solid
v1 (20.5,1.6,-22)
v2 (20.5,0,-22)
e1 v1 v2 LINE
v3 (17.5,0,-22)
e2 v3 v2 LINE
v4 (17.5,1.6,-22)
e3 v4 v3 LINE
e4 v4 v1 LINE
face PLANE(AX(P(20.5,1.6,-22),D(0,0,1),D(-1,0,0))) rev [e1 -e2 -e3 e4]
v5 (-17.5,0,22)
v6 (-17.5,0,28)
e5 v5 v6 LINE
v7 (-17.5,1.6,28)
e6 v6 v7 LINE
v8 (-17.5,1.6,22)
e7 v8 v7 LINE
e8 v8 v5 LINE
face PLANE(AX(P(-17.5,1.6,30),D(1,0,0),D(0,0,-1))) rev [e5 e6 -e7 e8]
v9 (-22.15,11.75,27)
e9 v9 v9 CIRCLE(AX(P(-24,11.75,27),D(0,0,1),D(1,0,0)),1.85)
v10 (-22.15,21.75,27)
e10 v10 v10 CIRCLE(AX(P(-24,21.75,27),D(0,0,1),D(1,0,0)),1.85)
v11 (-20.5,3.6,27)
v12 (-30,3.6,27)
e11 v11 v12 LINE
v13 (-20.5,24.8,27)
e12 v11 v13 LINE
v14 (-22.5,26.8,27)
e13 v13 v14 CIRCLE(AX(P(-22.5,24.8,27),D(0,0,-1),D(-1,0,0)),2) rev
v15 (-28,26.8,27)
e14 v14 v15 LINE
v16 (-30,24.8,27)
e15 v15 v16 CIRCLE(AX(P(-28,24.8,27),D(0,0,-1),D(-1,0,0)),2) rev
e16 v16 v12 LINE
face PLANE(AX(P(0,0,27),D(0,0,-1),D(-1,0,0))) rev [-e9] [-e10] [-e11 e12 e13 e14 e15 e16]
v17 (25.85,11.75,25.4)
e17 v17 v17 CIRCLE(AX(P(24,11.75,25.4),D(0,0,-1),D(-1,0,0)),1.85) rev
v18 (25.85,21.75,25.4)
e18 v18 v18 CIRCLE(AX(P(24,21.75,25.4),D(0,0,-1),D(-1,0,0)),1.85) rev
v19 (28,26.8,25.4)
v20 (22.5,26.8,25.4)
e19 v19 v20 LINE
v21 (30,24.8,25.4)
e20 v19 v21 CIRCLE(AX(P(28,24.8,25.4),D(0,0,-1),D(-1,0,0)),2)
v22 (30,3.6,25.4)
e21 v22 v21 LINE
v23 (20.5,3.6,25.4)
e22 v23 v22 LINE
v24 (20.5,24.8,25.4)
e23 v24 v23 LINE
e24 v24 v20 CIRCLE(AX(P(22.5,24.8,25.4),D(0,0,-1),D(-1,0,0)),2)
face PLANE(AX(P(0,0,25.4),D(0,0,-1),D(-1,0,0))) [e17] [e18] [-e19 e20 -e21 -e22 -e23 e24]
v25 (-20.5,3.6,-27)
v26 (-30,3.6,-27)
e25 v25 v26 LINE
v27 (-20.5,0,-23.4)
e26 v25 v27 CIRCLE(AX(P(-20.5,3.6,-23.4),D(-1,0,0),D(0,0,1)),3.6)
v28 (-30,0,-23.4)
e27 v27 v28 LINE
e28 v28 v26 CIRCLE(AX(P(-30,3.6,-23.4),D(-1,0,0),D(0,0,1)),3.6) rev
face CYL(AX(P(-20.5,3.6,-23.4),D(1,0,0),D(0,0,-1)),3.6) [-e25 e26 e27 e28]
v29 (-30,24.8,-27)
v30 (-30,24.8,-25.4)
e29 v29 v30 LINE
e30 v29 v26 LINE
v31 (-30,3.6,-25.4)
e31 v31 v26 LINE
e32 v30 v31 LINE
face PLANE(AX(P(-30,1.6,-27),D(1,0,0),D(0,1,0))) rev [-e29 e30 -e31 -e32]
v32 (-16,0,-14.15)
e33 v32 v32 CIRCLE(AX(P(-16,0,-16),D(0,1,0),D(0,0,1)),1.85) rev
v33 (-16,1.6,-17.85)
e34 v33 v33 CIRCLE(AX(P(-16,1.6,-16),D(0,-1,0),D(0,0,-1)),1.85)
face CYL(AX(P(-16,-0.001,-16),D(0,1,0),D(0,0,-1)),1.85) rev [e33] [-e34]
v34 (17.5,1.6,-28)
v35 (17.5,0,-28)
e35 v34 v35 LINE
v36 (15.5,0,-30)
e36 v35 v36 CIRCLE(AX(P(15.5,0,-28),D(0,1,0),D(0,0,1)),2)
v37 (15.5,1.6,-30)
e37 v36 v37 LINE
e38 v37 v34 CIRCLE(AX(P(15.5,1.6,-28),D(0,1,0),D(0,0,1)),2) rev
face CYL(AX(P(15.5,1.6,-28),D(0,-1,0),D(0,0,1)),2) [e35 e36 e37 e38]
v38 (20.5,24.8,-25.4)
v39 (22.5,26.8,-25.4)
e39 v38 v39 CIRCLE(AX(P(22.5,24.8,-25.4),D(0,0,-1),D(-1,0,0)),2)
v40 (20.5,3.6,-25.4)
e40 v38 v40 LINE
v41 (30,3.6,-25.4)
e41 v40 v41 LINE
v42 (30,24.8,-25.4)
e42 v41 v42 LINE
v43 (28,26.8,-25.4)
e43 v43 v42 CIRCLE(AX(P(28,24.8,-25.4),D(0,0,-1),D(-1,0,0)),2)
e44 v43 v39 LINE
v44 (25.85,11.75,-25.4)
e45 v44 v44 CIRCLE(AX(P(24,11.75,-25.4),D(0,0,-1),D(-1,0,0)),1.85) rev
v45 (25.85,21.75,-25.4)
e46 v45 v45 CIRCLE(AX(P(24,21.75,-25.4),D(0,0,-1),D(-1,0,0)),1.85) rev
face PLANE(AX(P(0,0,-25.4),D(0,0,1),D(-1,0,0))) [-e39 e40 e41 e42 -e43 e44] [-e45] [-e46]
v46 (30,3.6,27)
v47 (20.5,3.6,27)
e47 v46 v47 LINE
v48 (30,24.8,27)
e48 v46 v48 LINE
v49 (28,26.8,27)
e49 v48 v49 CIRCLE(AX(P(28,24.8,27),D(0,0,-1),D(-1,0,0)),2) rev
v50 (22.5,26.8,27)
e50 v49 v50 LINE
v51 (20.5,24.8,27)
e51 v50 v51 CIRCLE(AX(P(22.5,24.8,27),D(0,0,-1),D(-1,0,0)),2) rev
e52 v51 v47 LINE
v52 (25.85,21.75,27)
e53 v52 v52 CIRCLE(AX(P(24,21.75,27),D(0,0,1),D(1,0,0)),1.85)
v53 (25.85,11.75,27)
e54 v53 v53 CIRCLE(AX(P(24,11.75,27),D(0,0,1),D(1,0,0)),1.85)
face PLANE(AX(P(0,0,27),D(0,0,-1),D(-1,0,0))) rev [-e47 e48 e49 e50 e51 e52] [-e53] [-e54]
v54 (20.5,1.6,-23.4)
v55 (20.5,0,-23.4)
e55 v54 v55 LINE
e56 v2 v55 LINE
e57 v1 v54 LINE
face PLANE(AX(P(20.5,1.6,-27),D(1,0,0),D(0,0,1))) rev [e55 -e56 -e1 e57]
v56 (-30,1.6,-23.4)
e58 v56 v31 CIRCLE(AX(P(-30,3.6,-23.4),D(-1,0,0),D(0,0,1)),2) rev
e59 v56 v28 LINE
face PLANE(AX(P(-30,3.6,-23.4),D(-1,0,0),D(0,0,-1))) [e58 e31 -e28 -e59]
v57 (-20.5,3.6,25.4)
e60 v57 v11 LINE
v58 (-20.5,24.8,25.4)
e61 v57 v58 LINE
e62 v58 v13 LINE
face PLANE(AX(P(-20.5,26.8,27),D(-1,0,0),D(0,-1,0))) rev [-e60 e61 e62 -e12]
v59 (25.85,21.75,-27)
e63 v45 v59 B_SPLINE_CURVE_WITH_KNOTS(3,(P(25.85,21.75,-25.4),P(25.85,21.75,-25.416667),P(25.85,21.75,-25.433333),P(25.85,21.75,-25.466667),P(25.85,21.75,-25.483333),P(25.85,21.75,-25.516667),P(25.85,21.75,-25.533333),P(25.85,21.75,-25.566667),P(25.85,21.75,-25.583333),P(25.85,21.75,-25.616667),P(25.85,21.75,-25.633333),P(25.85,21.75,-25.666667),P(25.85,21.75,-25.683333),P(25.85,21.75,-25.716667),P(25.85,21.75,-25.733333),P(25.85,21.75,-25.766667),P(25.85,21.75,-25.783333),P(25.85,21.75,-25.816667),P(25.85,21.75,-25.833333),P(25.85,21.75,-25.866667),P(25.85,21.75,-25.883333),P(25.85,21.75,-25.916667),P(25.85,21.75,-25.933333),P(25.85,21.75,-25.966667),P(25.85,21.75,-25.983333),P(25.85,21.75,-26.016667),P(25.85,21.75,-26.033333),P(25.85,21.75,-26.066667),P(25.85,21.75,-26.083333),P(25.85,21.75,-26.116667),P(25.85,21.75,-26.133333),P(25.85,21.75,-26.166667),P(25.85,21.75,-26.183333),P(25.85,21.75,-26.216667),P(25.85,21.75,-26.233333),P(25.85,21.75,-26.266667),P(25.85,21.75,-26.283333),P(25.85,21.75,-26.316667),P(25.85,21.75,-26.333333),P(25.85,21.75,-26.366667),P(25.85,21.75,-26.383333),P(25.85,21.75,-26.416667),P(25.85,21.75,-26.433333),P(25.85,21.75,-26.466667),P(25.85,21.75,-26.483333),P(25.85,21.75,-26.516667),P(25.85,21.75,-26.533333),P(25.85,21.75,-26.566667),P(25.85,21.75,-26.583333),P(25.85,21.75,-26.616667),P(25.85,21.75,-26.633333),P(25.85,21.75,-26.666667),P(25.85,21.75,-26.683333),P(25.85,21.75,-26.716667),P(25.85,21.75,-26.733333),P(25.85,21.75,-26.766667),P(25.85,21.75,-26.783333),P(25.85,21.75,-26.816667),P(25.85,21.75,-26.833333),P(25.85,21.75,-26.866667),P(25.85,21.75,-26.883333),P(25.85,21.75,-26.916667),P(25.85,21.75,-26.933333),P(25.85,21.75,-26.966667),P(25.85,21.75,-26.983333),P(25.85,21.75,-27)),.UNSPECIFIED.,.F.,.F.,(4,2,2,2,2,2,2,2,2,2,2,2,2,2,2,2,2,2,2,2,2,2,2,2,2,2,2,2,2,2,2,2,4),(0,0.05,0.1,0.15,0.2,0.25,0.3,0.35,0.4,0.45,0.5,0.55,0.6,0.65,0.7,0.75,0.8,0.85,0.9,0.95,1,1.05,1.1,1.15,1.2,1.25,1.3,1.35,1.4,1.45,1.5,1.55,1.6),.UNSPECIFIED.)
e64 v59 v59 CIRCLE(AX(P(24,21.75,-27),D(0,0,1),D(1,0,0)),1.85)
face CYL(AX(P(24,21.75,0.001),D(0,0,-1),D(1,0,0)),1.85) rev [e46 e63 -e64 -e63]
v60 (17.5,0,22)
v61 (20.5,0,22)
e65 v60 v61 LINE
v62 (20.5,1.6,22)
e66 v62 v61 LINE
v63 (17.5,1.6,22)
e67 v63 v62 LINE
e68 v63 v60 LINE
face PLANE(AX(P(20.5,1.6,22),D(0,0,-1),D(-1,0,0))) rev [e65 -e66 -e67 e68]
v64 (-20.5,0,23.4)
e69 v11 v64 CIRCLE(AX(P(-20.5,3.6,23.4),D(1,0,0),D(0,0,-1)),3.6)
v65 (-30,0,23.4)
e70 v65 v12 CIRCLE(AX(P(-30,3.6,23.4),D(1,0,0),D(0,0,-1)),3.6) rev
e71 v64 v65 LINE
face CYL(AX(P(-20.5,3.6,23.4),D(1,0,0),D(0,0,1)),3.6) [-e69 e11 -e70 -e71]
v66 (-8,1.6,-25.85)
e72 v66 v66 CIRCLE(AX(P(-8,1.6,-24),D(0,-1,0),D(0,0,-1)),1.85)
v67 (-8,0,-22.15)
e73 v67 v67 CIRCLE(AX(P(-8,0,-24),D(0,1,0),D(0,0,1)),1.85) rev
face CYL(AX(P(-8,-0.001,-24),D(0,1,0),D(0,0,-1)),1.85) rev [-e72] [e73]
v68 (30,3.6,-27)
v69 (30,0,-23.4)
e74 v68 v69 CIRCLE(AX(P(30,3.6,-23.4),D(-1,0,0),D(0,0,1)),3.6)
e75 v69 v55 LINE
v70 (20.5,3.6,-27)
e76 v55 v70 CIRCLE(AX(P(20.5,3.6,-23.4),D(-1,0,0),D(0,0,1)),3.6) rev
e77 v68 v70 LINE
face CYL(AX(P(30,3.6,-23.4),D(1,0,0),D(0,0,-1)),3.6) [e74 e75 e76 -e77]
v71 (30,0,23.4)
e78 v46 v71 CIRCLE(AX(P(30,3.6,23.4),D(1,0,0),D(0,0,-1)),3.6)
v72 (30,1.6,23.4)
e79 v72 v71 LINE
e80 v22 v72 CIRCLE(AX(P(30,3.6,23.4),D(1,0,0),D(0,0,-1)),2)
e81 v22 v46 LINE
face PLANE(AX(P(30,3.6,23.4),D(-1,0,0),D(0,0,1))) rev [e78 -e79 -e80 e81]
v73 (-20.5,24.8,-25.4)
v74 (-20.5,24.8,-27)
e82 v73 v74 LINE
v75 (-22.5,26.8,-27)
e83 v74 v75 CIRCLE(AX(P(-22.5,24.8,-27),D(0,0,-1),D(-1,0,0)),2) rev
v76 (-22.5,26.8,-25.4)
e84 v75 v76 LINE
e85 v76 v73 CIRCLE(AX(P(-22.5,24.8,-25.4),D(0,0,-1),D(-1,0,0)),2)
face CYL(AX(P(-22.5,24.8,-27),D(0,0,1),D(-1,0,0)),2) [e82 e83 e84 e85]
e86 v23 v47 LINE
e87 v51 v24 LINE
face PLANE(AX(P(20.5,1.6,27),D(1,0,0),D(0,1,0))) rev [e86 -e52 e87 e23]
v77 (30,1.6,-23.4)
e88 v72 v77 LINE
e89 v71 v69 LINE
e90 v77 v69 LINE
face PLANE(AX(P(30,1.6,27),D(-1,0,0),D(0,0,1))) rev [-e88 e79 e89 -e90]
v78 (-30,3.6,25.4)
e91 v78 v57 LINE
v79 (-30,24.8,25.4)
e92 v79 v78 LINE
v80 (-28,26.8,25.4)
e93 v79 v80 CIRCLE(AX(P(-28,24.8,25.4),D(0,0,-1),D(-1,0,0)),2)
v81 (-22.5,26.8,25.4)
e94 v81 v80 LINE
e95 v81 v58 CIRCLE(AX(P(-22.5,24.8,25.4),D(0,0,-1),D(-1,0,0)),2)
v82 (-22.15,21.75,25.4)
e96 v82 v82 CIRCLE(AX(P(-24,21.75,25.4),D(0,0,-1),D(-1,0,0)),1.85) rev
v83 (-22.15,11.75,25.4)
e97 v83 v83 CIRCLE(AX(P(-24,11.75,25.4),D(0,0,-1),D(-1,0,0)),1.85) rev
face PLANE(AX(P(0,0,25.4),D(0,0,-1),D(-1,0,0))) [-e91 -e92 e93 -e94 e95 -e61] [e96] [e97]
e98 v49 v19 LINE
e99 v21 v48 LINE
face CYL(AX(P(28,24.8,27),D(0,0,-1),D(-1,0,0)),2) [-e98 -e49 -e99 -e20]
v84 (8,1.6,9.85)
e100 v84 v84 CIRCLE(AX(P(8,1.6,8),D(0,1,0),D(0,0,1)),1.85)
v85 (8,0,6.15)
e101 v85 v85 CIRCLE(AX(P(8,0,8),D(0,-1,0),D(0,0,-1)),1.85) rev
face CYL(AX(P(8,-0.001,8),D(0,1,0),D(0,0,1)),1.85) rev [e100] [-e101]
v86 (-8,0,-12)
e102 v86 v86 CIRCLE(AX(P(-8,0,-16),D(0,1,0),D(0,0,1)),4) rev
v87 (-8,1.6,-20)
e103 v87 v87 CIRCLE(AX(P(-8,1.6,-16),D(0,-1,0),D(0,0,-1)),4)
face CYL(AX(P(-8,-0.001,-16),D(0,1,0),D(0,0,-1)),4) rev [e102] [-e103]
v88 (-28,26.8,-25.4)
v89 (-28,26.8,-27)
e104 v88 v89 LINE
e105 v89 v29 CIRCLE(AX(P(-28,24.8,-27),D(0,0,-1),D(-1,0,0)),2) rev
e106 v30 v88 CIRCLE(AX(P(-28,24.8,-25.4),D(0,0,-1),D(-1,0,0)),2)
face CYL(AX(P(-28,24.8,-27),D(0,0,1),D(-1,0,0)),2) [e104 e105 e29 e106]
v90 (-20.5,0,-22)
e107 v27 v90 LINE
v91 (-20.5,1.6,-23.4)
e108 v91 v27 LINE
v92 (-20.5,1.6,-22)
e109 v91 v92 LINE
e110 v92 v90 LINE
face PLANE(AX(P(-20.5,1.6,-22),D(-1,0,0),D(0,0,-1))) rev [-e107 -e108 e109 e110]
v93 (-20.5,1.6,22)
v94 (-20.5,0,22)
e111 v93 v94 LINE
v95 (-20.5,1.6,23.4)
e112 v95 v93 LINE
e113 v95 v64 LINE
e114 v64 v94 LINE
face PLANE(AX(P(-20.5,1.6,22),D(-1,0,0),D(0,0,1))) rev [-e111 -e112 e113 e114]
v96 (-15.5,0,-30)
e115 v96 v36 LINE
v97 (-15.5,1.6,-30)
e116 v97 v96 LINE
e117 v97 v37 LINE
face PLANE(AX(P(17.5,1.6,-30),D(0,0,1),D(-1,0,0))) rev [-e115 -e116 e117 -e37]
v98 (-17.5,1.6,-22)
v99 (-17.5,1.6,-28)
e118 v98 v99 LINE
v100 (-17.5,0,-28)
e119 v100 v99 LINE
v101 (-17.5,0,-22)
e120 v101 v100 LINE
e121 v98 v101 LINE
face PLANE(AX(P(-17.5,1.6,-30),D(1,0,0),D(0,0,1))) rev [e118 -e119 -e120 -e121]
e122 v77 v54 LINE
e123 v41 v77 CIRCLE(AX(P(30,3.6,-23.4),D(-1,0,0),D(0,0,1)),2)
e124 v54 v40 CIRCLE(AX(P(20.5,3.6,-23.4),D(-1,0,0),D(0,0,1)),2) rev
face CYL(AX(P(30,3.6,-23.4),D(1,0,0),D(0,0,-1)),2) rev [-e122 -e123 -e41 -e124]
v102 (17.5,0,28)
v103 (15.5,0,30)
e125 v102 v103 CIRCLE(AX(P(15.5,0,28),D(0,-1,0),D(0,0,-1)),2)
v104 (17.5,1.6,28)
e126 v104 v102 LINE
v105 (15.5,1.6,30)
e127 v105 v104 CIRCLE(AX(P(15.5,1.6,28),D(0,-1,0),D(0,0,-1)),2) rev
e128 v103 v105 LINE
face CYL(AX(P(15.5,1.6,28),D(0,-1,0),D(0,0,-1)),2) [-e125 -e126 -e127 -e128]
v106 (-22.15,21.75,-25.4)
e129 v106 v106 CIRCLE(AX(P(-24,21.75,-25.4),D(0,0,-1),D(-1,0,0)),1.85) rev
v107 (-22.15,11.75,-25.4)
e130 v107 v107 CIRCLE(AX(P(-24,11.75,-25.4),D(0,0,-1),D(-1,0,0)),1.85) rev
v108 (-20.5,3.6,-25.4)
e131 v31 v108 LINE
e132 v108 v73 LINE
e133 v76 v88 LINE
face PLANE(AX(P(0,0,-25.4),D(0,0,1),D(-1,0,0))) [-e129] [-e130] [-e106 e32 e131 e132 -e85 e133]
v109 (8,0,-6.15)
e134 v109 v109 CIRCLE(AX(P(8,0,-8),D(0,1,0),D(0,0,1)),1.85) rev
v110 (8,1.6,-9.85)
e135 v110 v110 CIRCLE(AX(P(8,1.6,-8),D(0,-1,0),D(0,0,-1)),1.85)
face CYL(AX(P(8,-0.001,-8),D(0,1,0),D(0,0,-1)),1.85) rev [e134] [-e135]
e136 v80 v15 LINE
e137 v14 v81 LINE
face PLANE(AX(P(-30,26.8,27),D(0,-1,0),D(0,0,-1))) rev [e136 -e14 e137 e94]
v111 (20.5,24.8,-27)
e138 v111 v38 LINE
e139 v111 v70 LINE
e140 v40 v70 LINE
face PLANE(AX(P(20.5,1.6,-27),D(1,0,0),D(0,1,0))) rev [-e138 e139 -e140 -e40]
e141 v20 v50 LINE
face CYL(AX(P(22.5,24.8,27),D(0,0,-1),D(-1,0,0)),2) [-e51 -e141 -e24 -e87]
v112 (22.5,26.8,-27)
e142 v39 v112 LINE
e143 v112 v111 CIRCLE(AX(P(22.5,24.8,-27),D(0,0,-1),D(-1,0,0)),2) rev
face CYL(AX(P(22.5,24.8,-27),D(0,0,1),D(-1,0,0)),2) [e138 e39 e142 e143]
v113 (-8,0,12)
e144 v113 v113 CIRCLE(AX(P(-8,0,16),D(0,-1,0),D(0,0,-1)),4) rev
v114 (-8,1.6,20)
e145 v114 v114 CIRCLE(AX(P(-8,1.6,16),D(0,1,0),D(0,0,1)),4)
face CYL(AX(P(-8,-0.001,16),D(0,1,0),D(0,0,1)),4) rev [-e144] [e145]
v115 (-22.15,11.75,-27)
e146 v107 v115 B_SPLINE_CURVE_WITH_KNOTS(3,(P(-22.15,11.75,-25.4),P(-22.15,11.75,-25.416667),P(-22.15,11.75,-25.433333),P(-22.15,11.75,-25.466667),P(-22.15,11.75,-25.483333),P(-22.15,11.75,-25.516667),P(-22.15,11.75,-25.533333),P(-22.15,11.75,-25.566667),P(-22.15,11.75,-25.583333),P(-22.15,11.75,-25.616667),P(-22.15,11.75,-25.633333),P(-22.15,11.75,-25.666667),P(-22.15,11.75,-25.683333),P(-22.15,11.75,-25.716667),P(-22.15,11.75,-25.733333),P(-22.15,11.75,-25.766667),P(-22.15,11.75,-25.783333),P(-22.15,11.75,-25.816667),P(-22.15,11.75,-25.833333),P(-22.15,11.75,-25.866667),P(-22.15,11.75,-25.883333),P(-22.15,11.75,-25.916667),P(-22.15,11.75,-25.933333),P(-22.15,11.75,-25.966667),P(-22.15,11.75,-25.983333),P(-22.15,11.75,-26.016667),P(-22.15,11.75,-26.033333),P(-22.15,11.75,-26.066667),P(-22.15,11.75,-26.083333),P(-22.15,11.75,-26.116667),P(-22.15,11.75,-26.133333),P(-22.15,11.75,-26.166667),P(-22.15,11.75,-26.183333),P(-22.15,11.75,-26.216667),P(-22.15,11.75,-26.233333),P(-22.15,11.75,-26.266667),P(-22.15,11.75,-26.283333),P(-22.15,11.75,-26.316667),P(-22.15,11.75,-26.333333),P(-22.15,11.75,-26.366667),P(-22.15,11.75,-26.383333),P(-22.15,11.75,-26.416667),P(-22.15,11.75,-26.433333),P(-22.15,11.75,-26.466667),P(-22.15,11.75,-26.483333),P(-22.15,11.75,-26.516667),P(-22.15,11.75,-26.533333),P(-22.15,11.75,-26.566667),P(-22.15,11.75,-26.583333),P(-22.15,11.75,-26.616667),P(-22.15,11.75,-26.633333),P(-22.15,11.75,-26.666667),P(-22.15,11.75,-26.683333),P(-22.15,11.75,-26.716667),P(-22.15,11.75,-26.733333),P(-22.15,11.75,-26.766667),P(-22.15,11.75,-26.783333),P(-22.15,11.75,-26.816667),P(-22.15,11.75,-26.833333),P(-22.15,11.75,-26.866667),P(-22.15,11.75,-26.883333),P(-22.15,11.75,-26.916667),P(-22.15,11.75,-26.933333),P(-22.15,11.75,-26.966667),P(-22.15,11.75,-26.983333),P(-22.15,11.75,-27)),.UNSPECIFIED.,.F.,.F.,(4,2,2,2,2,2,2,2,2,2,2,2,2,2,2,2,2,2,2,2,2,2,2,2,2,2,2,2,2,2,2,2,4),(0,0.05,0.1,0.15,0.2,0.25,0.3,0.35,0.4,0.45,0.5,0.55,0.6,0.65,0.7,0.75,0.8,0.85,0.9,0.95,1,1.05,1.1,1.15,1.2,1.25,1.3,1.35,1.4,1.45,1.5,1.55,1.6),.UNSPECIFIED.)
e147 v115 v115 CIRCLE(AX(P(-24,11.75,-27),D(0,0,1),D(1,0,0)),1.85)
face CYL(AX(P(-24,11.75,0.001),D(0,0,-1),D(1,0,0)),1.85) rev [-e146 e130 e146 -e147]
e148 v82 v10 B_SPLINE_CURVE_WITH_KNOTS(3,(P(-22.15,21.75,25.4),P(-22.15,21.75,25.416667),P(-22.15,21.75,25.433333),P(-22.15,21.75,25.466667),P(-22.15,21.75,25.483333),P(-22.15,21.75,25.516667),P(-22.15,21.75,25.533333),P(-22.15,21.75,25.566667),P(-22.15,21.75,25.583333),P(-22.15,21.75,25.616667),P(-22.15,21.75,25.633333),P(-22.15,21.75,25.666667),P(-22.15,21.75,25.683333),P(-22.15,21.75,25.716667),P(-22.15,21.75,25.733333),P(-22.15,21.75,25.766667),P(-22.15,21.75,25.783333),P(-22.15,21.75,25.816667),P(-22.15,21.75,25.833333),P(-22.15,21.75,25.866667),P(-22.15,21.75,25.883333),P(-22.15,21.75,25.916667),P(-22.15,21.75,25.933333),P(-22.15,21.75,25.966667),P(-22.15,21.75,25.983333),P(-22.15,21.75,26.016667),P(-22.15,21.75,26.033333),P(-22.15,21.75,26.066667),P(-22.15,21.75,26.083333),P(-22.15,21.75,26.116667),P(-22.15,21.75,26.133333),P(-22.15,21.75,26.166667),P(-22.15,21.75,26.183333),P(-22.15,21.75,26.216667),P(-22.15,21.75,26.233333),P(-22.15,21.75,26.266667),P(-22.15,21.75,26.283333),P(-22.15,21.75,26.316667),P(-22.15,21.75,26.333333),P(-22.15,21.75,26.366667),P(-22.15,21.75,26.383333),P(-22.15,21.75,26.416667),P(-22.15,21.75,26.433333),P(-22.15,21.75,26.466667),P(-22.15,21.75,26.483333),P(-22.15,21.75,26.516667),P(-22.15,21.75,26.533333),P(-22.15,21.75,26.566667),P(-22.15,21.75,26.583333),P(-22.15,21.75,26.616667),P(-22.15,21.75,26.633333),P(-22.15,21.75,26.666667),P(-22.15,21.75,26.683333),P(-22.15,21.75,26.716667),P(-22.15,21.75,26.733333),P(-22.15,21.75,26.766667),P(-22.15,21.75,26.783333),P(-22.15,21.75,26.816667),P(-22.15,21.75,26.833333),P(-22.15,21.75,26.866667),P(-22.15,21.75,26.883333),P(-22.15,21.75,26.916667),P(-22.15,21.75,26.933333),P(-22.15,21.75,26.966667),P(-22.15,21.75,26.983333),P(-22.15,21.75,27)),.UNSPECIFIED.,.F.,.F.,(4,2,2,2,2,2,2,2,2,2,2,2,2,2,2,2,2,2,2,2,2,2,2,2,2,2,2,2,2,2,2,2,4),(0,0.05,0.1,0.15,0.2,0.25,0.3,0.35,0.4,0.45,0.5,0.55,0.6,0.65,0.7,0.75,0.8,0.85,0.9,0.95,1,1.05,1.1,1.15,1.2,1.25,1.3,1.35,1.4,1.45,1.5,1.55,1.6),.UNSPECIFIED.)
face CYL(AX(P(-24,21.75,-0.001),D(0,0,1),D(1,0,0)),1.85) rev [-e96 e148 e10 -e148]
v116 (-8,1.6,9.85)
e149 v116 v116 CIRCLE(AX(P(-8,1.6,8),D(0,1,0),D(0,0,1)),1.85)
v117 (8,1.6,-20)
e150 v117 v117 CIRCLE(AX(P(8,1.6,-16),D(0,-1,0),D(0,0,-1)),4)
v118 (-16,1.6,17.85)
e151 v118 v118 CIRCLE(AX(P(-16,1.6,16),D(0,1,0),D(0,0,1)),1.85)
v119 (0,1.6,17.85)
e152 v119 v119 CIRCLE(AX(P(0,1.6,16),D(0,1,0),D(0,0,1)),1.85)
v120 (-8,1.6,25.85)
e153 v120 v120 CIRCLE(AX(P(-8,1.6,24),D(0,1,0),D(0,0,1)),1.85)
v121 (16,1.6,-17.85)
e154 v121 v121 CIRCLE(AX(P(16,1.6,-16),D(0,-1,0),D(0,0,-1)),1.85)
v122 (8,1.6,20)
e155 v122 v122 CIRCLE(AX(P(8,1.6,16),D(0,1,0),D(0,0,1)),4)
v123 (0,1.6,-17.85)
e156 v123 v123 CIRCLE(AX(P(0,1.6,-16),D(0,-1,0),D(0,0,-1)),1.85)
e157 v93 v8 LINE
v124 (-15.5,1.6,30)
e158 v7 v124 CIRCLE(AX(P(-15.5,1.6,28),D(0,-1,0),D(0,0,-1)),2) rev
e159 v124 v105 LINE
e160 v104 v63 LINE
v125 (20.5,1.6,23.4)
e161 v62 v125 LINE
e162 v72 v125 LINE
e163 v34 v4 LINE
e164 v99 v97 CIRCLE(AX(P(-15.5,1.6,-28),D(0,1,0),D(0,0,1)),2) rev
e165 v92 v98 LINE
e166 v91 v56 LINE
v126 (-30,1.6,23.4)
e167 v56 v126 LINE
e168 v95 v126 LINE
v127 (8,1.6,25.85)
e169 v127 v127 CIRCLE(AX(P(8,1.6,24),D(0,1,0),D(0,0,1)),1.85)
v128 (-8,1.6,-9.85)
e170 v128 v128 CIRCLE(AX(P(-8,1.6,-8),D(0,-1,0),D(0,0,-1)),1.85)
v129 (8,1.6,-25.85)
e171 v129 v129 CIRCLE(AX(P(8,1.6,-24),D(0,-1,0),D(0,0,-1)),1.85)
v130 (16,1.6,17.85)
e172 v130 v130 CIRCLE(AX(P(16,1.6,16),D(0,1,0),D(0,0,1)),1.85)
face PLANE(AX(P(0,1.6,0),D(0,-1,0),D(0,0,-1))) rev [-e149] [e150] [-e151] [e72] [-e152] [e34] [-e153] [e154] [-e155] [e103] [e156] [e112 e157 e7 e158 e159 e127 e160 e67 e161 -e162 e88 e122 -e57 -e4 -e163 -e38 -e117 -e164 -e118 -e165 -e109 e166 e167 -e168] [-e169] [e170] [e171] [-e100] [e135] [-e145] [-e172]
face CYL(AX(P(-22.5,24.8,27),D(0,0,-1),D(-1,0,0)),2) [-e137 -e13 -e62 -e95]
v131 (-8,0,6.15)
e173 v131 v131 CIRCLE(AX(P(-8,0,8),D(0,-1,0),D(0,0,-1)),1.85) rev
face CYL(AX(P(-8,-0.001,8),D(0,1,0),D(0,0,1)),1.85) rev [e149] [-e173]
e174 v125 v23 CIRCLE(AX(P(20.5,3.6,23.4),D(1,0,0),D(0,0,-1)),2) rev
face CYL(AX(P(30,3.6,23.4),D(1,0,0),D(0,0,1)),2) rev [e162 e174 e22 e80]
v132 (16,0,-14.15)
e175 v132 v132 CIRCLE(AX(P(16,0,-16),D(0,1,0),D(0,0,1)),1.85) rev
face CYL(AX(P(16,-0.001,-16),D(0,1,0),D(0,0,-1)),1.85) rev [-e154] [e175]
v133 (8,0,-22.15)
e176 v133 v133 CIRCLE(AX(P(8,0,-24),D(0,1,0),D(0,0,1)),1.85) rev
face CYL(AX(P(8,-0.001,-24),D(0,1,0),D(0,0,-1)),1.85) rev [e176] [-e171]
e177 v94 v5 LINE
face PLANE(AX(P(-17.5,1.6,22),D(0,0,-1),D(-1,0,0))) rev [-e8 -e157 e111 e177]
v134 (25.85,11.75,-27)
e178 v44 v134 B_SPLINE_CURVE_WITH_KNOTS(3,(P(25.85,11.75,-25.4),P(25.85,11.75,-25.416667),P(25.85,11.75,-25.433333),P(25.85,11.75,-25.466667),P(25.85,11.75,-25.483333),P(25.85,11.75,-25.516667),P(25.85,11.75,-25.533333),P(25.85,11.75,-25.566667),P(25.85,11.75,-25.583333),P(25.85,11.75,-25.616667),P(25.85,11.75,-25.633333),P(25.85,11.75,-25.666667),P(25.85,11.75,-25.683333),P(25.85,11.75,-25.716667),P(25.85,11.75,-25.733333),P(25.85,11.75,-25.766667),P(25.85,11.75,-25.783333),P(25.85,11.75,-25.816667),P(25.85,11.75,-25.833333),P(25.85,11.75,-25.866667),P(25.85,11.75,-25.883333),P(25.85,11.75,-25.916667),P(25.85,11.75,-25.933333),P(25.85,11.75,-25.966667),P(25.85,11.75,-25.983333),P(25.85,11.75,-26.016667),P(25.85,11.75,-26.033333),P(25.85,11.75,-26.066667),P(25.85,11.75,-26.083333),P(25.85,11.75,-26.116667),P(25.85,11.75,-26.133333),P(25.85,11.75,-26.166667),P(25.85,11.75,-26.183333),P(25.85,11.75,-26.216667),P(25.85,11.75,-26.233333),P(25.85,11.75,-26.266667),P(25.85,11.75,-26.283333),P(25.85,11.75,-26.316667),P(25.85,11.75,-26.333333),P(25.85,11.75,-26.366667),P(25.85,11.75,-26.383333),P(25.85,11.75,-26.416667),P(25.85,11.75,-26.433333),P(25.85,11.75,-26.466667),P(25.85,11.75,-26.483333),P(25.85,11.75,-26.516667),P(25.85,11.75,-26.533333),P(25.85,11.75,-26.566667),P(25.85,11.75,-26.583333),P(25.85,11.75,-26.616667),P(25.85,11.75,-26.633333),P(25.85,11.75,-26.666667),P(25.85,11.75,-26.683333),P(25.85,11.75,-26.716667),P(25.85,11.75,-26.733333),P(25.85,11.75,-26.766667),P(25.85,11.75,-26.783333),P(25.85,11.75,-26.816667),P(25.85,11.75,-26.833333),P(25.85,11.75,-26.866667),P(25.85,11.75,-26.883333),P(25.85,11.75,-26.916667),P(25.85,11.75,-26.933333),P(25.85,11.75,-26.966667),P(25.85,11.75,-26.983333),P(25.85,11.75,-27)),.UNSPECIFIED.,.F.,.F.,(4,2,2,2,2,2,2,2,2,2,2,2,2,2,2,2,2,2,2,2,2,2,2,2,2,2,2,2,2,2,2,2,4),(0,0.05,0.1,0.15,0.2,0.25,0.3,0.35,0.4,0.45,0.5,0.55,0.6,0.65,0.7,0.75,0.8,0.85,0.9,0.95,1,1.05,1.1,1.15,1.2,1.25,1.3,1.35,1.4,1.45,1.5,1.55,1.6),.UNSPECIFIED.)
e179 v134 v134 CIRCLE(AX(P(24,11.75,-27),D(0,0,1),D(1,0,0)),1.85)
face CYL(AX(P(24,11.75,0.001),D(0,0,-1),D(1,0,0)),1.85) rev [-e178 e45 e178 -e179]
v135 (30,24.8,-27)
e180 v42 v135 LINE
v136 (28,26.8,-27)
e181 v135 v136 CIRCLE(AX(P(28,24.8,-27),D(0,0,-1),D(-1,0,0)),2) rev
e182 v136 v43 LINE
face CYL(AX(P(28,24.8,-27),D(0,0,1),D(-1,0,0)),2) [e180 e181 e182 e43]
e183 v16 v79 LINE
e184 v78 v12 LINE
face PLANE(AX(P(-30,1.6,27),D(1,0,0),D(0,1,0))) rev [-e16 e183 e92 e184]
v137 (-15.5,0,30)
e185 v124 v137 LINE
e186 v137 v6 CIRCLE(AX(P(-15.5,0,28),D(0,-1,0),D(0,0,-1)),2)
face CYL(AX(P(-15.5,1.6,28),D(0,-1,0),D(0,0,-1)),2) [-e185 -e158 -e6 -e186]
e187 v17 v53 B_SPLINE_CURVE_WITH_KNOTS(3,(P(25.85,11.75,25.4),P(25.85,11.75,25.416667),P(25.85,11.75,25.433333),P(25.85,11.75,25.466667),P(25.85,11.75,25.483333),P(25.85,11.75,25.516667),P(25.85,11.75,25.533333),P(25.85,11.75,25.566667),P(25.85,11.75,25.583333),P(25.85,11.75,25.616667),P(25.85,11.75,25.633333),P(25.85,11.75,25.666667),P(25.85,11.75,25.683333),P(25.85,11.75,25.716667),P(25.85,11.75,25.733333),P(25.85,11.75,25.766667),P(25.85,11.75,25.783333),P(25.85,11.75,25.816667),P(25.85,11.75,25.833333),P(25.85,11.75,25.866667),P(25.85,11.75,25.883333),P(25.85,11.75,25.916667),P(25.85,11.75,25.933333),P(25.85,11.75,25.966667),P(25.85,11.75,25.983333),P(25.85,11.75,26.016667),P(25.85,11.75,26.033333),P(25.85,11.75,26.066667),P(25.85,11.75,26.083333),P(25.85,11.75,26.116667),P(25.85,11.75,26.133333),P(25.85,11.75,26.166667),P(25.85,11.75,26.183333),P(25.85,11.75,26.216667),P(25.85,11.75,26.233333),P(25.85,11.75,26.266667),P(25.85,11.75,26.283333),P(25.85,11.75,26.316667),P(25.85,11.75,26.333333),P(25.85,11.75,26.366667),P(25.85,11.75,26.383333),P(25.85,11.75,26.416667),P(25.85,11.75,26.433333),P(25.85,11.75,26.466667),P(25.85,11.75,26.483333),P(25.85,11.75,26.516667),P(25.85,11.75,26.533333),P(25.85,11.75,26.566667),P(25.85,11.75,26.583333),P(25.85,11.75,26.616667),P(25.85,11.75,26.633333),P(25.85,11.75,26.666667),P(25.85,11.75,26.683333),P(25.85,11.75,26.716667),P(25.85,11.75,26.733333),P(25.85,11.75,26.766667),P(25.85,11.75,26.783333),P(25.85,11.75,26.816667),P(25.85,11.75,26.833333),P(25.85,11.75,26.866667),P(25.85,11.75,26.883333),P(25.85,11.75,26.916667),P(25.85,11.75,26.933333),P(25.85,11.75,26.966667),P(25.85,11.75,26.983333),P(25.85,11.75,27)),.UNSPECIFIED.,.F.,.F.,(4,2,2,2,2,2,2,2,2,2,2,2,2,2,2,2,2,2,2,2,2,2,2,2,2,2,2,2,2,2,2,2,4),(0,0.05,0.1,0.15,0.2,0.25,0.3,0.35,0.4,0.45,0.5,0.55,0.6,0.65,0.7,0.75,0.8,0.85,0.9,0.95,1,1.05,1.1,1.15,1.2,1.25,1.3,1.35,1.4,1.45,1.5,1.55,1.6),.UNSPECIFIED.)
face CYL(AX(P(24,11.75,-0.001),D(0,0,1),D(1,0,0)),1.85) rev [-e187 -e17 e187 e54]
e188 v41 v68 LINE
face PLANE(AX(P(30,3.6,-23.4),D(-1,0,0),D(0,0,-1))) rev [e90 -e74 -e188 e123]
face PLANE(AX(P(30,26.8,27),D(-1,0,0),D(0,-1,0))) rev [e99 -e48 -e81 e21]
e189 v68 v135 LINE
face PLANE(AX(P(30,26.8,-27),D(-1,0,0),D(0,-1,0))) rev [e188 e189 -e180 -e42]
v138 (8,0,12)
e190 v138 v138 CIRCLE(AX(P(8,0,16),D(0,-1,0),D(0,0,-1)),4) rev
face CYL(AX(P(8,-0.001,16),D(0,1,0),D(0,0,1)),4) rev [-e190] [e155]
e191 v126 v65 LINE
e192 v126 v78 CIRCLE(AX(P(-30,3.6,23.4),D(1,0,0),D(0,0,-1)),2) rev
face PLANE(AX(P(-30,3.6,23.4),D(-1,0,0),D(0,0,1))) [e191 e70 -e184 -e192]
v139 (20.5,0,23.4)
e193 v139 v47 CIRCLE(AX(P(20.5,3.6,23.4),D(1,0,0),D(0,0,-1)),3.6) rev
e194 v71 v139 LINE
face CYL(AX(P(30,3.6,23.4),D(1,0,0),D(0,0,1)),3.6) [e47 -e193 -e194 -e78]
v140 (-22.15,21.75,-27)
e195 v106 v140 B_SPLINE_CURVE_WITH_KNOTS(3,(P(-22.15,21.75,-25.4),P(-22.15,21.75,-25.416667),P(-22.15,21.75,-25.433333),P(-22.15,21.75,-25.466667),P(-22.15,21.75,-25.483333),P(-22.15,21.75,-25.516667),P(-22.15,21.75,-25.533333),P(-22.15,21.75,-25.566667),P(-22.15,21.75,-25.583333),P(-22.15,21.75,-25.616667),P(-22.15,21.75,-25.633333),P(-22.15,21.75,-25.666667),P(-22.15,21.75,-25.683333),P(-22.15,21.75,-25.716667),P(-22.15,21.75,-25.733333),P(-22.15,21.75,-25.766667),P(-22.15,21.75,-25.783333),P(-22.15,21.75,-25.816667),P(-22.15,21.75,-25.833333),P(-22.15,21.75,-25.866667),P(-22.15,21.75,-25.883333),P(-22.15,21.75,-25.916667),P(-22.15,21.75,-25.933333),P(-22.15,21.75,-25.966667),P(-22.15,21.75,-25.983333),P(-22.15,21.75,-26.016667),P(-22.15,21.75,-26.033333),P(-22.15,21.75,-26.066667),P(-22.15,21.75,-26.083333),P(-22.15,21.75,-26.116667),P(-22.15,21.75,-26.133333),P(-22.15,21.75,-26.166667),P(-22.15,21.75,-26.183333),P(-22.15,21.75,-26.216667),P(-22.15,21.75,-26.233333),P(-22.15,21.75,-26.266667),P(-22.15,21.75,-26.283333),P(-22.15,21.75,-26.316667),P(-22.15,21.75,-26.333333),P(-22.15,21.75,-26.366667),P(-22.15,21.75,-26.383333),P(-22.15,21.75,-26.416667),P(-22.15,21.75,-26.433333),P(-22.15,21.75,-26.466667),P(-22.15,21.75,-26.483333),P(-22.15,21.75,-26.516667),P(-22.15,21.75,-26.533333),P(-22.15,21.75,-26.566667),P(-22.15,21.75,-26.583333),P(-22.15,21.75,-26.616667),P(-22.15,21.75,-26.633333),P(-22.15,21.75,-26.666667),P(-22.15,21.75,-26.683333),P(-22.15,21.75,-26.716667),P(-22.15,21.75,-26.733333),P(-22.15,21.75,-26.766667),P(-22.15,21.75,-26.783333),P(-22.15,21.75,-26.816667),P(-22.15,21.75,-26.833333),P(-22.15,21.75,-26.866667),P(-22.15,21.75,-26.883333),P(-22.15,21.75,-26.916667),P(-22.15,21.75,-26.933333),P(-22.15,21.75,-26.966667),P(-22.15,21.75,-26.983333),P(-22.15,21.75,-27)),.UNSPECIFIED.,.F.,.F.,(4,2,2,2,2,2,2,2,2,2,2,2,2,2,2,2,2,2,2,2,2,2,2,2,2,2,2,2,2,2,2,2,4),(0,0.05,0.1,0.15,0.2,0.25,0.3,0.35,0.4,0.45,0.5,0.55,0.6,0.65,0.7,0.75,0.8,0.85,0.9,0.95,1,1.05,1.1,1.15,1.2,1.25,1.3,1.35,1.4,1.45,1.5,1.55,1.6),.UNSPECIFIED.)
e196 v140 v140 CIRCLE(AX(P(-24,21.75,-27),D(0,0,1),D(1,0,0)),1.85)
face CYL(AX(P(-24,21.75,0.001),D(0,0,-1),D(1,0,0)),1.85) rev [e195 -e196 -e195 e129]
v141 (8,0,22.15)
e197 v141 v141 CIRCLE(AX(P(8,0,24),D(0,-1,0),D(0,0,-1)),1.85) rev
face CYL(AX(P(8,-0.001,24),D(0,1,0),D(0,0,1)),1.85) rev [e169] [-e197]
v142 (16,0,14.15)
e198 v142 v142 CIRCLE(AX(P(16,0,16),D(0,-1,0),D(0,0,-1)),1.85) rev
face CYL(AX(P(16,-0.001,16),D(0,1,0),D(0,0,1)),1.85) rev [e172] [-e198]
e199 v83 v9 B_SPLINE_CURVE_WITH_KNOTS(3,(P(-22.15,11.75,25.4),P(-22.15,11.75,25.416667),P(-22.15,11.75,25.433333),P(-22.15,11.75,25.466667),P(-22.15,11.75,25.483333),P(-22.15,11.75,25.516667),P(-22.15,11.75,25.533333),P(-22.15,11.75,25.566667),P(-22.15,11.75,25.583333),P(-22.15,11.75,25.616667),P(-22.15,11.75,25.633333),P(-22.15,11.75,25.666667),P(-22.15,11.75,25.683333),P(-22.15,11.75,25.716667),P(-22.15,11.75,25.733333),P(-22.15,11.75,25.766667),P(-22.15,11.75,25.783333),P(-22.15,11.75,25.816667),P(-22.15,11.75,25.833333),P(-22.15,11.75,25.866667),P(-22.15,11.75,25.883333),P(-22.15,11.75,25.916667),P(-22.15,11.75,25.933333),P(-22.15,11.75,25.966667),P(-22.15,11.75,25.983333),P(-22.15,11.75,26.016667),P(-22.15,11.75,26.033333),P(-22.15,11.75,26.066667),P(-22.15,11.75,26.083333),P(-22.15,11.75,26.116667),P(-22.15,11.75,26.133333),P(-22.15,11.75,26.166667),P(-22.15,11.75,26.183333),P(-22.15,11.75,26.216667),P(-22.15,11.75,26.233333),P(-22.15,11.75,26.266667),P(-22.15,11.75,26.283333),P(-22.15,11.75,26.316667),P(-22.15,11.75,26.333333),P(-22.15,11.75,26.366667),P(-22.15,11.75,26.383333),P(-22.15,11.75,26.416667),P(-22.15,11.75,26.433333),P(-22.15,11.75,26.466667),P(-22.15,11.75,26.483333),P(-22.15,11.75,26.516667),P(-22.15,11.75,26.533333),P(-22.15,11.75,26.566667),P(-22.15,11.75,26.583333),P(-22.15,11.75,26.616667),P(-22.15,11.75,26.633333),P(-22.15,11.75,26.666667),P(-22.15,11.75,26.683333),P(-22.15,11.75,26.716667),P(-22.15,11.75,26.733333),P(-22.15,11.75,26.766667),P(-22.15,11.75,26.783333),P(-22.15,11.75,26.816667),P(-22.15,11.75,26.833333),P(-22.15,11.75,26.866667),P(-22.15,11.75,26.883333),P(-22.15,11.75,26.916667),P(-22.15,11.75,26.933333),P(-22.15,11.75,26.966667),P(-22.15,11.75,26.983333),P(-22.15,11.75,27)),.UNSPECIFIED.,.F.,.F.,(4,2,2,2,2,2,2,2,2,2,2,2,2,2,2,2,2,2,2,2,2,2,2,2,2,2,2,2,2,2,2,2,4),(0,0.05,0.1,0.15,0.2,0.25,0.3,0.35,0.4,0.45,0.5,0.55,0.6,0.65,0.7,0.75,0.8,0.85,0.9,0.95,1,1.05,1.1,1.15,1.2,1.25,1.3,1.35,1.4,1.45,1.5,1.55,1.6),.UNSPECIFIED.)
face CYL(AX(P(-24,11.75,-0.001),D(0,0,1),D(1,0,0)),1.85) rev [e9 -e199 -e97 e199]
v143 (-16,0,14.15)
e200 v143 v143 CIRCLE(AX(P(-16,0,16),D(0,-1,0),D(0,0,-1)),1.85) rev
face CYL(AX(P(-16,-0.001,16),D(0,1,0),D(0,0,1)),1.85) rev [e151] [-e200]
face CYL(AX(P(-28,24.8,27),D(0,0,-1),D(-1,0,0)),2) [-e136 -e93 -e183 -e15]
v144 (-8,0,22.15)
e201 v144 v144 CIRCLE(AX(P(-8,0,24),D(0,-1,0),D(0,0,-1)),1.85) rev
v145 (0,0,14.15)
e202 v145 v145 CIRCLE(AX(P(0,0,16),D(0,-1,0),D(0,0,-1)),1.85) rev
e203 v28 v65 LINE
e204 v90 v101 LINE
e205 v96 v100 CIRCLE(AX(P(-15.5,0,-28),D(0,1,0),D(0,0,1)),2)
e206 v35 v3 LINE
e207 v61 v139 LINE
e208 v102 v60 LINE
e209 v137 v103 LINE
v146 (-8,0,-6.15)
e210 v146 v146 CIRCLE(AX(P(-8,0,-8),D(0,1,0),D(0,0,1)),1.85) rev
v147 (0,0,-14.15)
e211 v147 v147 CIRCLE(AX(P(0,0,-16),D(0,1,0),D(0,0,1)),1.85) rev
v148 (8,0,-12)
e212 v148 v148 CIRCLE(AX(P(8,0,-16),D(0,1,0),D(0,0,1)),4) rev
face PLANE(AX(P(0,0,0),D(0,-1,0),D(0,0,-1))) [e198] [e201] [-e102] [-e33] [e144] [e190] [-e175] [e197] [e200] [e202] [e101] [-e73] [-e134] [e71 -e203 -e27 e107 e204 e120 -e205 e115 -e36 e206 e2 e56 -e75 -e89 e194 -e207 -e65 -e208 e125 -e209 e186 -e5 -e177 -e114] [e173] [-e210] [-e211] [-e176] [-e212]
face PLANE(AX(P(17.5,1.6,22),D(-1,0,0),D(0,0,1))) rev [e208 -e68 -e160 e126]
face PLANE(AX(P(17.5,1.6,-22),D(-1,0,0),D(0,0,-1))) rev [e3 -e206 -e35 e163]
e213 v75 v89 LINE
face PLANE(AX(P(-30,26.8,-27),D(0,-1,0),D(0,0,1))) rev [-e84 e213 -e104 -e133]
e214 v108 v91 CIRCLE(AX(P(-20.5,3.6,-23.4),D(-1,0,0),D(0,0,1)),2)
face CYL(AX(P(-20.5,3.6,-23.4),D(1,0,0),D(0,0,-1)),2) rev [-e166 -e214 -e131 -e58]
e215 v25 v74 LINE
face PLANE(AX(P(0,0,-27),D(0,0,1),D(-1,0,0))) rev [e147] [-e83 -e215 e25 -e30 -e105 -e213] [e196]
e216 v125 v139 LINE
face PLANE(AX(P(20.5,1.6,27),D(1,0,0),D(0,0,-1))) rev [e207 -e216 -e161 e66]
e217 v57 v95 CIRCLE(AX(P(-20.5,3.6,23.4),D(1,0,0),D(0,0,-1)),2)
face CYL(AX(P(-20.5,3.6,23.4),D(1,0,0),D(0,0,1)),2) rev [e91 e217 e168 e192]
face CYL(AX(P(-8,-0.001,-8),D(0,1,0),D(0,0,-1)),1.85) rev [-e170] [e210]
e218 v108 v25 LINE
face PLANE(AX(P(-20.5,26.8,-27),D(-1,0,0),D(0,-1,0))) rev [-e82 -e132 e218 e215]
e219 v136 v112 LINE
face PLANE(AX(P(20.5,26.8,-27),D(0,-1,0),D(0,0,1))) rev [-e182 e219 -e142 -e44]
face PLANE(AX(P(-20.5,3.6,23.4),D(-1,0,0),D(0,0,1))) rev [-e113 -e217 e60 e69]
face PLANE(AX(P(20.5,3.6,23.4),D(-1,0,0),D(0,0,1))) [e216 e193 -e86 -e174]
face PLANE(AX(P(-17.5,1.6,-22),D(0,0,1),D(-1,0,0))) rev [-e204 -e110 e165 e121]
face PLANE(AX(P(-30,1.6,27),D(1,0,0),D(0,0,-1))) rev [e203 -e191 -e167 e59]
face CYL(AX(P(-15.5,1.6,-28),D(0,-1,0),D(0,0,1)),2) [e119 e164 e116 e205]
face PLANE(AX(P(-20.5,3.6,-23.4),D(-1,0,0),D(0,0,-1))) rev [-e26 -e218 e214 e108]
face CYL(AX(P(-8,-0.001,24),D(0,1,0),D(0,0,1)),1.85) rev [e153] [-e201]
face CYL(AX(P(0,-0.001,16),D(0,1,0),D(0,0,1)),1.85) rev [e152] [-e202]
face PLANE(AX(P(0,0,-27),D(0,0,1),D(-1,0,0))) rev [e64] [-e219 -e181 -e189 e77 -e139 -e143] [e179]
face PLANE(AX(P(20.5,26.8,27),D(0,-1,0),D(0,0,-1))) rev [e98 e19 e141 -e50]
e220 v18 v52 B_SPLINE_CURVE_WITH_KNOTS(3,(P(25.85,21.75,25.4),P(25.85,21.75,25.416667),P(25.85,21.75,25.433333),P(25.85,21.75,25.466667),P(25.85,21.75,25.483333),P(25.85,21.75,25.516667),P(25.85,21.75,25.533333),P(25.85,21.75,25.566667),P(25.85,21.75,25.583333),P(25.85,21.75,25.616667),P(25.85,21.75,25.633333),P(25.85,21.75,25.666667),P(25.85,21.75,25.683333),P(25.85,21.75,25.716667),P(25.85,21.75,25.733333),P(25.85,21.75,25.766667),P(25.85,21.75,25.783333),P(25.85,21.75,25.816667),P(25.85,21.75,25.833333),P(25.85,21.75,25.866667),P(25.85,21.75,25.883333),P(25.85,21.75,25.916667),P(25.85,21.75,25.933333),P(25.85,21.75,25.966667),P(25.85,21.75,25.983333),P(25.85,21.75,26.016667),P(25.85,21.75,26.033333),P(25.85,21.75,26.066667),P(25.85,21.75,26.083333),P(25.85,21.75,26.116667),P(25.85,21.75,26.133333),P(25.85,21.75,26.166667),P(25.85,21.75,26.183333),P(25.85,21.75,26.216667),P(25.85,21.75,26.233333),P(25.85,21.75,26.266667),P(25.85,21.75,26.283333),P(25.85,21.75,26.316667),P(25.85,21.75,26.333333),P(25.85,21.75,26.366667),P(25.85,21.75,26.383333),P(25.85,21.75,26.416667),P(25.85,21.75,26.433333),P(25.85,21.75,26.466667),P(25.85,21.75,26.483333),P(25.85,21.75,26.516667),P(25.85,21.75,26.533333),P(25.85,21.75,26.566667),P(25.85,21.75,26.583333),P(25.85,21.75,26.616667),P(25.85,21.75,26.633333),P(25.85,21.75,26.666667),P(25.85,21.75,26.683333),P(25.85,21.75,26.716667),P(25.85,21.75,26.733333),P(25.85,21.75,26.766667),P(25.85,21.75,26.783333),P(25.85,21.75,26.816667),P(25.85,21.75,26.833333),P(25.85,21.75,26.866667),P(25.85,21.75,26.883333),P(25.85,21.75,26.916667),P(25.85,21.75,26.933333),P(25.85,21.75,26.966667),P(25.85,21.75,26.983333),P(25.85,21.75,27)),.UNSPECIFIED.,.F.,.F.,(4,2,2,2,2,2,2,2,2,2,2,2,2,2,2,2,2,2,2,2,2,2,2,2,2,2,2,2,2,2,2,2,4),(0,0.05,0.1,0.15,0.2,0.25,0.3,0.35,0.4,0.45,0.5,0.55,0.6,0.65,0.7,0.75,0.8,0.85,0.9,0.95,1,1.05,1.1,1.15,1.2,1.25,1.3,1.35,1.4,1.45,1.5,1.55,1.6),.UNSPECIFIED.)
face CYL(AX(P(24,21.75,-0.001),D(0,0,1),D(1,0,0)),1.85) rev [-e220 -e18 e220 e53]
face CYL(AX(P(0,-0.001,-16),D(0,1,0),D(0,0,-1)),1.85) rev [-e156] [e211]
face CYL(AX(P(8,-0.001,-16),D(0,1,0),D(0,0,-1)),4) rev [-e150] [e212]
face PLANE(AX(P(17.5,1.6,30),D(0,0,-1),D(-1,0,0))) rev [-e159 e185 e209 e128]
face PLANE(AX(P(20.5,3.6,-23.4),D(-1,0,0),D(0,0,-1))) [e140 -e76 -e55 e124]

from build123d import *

# Parameters (mm, degrees)
BASE_FLANGE1_DEPTH             = 1.6
EDGE_FLANGE1_STRIP_W           = 10.4
EDGE_FLANGE1_STRIP_H           = 1.6
EDGE_FLANGE1_STRIP_CUT_DEPTH   = 9.5
EDGE_FLANGE1_STRIP_2_W         = 10.4
EDGE_FLANGE1_STRIP_2_H         = 1.6
EDGE_FLANGE1_STRIP_CUT_2_DEPTH = 9.5
EDGE_FLANGE1_DEPTH             = 9.5
EDGE_FLANGE1_BEND_DEPTH        = 9.5
CUT_EXTRUDE1_REACH             = 51.346
SKETCH15_R                     = 1.85
SKETCH15_R_2                   = 4
CUT_EXTRUDE2_REACH             = 50.448
SKETCH16_R                     = 1.85
FILLET1_R                      = 2


# Sheet-metal steps are written as plain solids
with BuildPart() as part:
    # Sketch1 → Base-Flange1 (new body)
    with BuildSketch(Plane(origin=(0, 0, 0), x_dir=(1, 0, 0), z_dir=(0, 1, 0))):
        Polygon((-30, 0), (30, 0), (30, -27), (20.5, -27), (20.5, -22), (17.5, -22), (17.5, -30), (-17.5, -30), (-17.5, -22), (-20.5, -22), (-20.5, -27), (-30, -27), align=None)
    extrude(amount=BASE_FLANGE1_DEPTH)

    # Edge-Flange1 strip (across the edge) → Edge-Flange1 strip cut (cut)
    with BuildSketch(Plane(origin=(20.5, 1.6, 27), x_dir=(0, 0, -1), z_dir=(1, 0, 0))):
        with Locations((-1.6, -0.8)):
            Rectangle(EDGE_FLANGE1_STRIP_W, EDGE_FLANGE1_STRIP_H)
    extrude(amount=EDGE_FLANGE1_STRIP_CUT_DEPTH, mode=Mode.SUBTRACT)

    # Edge-Flange1 strip 2 (across the edge) → Edge-Flange1 strip cut 2 (cut)
    with BuildSketch(Plane(origin=(-30, 1.6, 27), x_dir=(0, 0, -1), z_dir=(1, 0, 0))):
        with Locations((-1.6, -0.8)):
            Rectangle(EDGE_FLANGE1_STRIP_2_W, EDGE_FLANGE1_STRIP_2_H)
    extrude(amount=EDGE_FLANGE1_STRIP_CUT_2_DEPTH, mode=Mode.SUBTRACT)

    # Edge-Flange1 section (across the edge) → Edge-Flange1 (add)
    with BuildSketch(Plane(origin=(20.5, 1.6, 27), x_dir=(0, 0, -1), z_dir=(1, 0, 0))):
        with BuildLine():
            Line((0, 2), (0, 25.2))
            Line((0, 25.2), (1.6, 25.2))
            Line((1.6, 25.2), (1.6, 2))
            ThreePointArc((1.6, 2), (2.185786438, 0.585786438), (3.6, 0))
            Line((3.6, 0), (3.6, -1.6))
            ThreePointArc((3.6, -1.6), (1.054415588, -0.545584412), (0, 2))
        make_face()
    extrude(amount=EDGE_FLANGE1_DEPTH)

    # Edge-Flange1 section 2 (across the edge) → Edge-Flange1 bend (add)
    with BuildSketch(Plane(origin=(-30, 1.6, 27), x_dir=(0, 0, -1), z_dir=(1, 0, 0))):
        with BuildLine():
            Line((0, 2), (0, 25.2))
            Line((0, 25.2), (1.6, 25.2))
            Line((1.6, 25.2), (1.6, 2))
            ThreePointArc((1.6, 2), (2.185786438, 0.585786438), (3.6, 0))
            Line((3.6, 0), (3.6, -1.6))
            ThreePointArc((3.6, -1.6), (1.054415588, -0.545584412), (0, 2))
        make_face()
    extrude(amount=EDGE_FLANGE1_BEND_DEPTH)

    # Sketch15 → Cut-Extrude1 (cut, up to next)
    with BuildSketch(Plane(origin=(0, 1.6, 0), x_dir=(1, 0, 0), z_dir=(0, 1, 0)), mode=Mode.PRIVATE) as cut_extrude1_sk1:
        with Locations(Location((0, -16, 0), (0, 0, 270))):
            Circle(SKETCH15_R)
    cut_extrude1_tool1 = extrude(cut_extrude1_sk1.sketch, amount=-CUT_EXTRUDE1_REACH, mode=Mode.PRIVATE) & part.part
    # Sketch15 → Cut-Extrude1 (cut, up to next)
    with BuildSketch(Plane(origin=(0, 1.6, 0), x_dir=(1, 0, 0), z_dir=(0, 1, 0)), mode=Mode.PRIVATE) as cut_extrude1_sk2:
        with Locations(Location((8, -16, 0), (0, 0, 270))):
            Circle(SKETCH15_R_2)
    cut_extrude1_tool2 = extrude(cut_extrude1_sk2.sketch, amount=-CUT_EXTRUDE1_REACH, mode=Mode.PRIVATE) & part.part
    # Sketch15 → Cut-Extrude1 (cut, up to next)
    with BuildSketch(Plane(origin=(0, 1.6, 0), x_dir=(1, 0, 0), z_dir=(0, 1, 0)), mode=Mode.PRIVATE) as cut_extrude1_sk3:
        with Locations(Location((-8, -16, 0), (0, 0, 270))):
            Circle(SKETCH15_R_2)
    cut_extrude1_tool3 = extrude(cut_extrude1_sk3.sketch, amount=-CUT_EXTRUDE1_REACH, mode=Mode.PRIVATE) & part.part
    # Sketch15 → Cut-Extrude1 (cut, up to next)
    with BuildSketch(Plane(origin=(0, 1.6, 0), x_dir=(1, 0, 0), z_dir=(0, 1, 0)), mode=Mode.PRIVATE) as cut_extrude1_sk4:
        with Locations(Location((16, -16, 0), (0, 0, 270))):
            Circle(SKETCH15_R)
    cut_extrude1_tool4 = extrude(cut_extrude1_sk4.sketch, amount=-CUT_EXTRUDE1_REACH, mode=Mode.PRIVATE) & part.part
    # Sketch15 → Cut-Extrude1 (cut, up to next)
    with BuildSketch(Plane(origin=(0, 1.6, 0), x_dir=(1, 0, 0), z_dir=(0, 1, 0)), mode=Mode.PRIVATE) as cut_extrude1_sk5:
        with Locations(Location((-16, -16, 0), (0, 0, 270))):
            Circle(SKETCH15_R)
    cut_extrude1_tool5 = extrude(cut_extrude1_sk5.sketch, amount=-CUT_EXTRUDE1_REACH, mode=Mode.PRIVATE) & part.part
    # Sketch15 → Cut-Extrude1 (cut, up to next)
    with BuildSketch(Plane(origin=(0, 1.6, 0), x_dir=(1, 0, 0), z_dir=(0, 1, 0)), mode=Mode.PRIVATE) as cut_extrude1_sk6:
        with Locations(Location((-8, -8, 0), (0, 0, 270))):
            Circle(SKETCH15_R)
    cut_extrude1_tool6 = extrude(cut_extrude1_sk6.sketch, amount=-CUT_EXTRUDE1_REACH, mode=Mode.PRIVATE) & part.part
    # Sketch15 → Cut-Extrude1 (cut, up to next)
    with BuildSketch(Plane(origin=(0, 1.6, 0), x_dir=(1, 0, 0), z_dir=(0, 1, 0)), mode=Mode.PRIVATE) as cut_extrude1_sk7:
        with Locations(Location((-8, -24, 0), (0, 0, 270))):
            Circle(SKETCH15_R)
    cut_extrude1_tool7 = extrude(cut_extrude1_sk7.sketch, amount=-CUT_EXTRUDE1_REACH, mode=Mode.PRIVATE) & part.part
    # Sketch15 → Cut-Extrude1 (cut, up to next)
    with BuildSketch(Plane(origin=(0, 1.6, 0), x_dir=(1, 0, 0), z_dir=(0, 1, 0)), mode=Mode.PRIVATE) as cut_extrude1_sk8:
        with Locations(Location((8, -24, 0), (0, 0, 270))):
            Circle(SKETCH15_R)
    cut_extrude1_tool8 = extrude(cut_extrude1_sk8.sketch, amount=-CUT_EXTRUDE1_REACH, mode=Mode.PRIVATE) & part.part
    # Sketch15 → Cut-Extrude1 (cut, up to next)
    with BuildSketch(Plane(origin=(0, 1.6, 0), x_dir=(1, 0, 0), z_dir=(0, 1, 0)), mode=Mode.PRIVATE) as cut_extrude1_sk9:
        with Locations(Location((8, -8, 0), (0, 0, 270))):
            Circle(SKETCH15_R)
    cut_extrude1_tool9 = extrude(cut_extrude1_sk9.sketch, amount=-CUT_EXTRUDE1_REACH, mode=Mode.PRIVATE) & part.part
    add(cut_extrude1_tool1.solids().sort_by_distance((0, 1.6, 16))[0], mode=Mode.SUBTRACT)
    add(cut_extrude1_tool2.solids().sort_by_distance((8, 1.6, 16))[0], mode=Mode.SUBTRACT)
    add(cut_extrude1_tool3.solids().sort_by_distance((-8, 1.6, 16))[0], mode=Mode.SUBTRACT)
    add(cut_extrude1_tool4.solids().sort_by_distance((16, 1.6, 16))[0], mode=Mode.SUBTRACT)
    add(cut_extrude1_tool5.solids().sort_by_distance((-16, 1.6, 16))[0], mode=Mode.SUBTRACT)
    add(cut_extrude1_tool6.solids().sort_by_distance((-8, 1.6, 8))[0], mode=Mode.SUBTRACT)
    add(cut_extrude1_tool7.solids().sort_by_distance((-8, 1.6, 24))[0], mode=Mode.SUBTRACT)
    add(cut_extrude1_tool8.solids().sort_by_distance((8, 1.6, 24))[0], mode=Mode.SUBTRACT)
    add(cut_extrude1_tool9.solids().sort_by_distance((8, 1.6, 8))[0], mode=Mode.SUBTRACT)

    # Sketch16 → Cut-Extrude2 (cut, up to next)
    with BuildSketch(Plane.XY.offset(27), mode=Mode.PRIVATE) as cut_extrude2_sk1:
        with Locations((-24, 21.75)):
            Circle(SKETCH16_R)
    cut_extrude2_tool1 = extrude(cut_extrude2_sk1.sketch, amount=-CUT_EXTRUDE2_REACH, mode=Mode.PRIVATE) & part.part
    # Sketch16 → Cut-Extrude2 (cut, up to next)
    with BuildSketch(Plane.XY.offset(27), mode=Mode.PRIVATE) as cut_extrude2_sk2:
        with Locations((-24, 11.75)):
            Circle(SKETCH16_R)
    cut_extrude2_tool2 = extrude(cut_extrude2_sk2.sketch, amount=-CUT_EXTRUDE2_REACH, mode=Mode.PRIVATE) & part.part
    # Sketch16 → Cut-Extrude2 (cut, up to next)
    with BuildSketch(Plane.XY.offset(27), mode=Mode.PRIVATE) as cut_extrude2_sk3:
        with Locations((24, 21.75)):
            Circle(SKETCH16_R)
    cut_extrude2_tool3 = extrude(cut_extrude2_sk3.sketch, amount=-CUT_EXTRUDE2_REACH, mode=Mode.PRIVATE) & part.part
    # Sketch16 → Cut-Extrude2 (cut, up to next)
    with BuildSketch(Plane.XY.offset(27), mode=Mode.PRIVATE) as cut_extrude2_sk4:
        with Locations((24, 11.75)):
            Circle(SKETCH16_R)
    cut_extrude2_tool4 = extrude(cut_extrude2_sk4.sketch, amount=-CUT_EXTRUDE2_REACH, mode=Mode.PRIVATE) & part.part
    add(cut_extrude2_tool1.solids().sort_by_distance((-24, 21.75, 27))[0], mode=Mode.SUBTRACT)
    add(cut_extrude2_tool2.solids().sort_by_distance((-24, 11.75, 27))[0], mode=Mode.SUBTRACT)
    add(cut_extrude2_tool3.solids().sort_by_distance((24, 21.75, 27))[0], mode=Mode.SUBTRACT)
    add(cut_extrude2_tool4.solids().sort_by_distance((24, 11.75, 27))[0], mode=Mode.SUBTRACT)

    # Fillet1
    fillet1_edges = [part.edges().sort_by_distance(p)[0] for p in [
        (17.5, 0.8, 30),
        (-17.5, 0.8, 30),
        (20.5, 26.8, 26.2),
        (30, 26.8, 26.2),
        (-30, 26.8, 26.2),
        (-20.5, 26.8, 26.2),
    ]]
    fillet(fillet1_edges, radius=FILLET1_R)

    # Mirror1: part across plane


with BuildPart() as part_1:
    add(part.part)
    add(part.part.mirror(Plane(origin=(-30, 1.6, 0), x_dir=(1, 0, 0), z_dir=(0, 0, 1))))


solid = part_1.part
